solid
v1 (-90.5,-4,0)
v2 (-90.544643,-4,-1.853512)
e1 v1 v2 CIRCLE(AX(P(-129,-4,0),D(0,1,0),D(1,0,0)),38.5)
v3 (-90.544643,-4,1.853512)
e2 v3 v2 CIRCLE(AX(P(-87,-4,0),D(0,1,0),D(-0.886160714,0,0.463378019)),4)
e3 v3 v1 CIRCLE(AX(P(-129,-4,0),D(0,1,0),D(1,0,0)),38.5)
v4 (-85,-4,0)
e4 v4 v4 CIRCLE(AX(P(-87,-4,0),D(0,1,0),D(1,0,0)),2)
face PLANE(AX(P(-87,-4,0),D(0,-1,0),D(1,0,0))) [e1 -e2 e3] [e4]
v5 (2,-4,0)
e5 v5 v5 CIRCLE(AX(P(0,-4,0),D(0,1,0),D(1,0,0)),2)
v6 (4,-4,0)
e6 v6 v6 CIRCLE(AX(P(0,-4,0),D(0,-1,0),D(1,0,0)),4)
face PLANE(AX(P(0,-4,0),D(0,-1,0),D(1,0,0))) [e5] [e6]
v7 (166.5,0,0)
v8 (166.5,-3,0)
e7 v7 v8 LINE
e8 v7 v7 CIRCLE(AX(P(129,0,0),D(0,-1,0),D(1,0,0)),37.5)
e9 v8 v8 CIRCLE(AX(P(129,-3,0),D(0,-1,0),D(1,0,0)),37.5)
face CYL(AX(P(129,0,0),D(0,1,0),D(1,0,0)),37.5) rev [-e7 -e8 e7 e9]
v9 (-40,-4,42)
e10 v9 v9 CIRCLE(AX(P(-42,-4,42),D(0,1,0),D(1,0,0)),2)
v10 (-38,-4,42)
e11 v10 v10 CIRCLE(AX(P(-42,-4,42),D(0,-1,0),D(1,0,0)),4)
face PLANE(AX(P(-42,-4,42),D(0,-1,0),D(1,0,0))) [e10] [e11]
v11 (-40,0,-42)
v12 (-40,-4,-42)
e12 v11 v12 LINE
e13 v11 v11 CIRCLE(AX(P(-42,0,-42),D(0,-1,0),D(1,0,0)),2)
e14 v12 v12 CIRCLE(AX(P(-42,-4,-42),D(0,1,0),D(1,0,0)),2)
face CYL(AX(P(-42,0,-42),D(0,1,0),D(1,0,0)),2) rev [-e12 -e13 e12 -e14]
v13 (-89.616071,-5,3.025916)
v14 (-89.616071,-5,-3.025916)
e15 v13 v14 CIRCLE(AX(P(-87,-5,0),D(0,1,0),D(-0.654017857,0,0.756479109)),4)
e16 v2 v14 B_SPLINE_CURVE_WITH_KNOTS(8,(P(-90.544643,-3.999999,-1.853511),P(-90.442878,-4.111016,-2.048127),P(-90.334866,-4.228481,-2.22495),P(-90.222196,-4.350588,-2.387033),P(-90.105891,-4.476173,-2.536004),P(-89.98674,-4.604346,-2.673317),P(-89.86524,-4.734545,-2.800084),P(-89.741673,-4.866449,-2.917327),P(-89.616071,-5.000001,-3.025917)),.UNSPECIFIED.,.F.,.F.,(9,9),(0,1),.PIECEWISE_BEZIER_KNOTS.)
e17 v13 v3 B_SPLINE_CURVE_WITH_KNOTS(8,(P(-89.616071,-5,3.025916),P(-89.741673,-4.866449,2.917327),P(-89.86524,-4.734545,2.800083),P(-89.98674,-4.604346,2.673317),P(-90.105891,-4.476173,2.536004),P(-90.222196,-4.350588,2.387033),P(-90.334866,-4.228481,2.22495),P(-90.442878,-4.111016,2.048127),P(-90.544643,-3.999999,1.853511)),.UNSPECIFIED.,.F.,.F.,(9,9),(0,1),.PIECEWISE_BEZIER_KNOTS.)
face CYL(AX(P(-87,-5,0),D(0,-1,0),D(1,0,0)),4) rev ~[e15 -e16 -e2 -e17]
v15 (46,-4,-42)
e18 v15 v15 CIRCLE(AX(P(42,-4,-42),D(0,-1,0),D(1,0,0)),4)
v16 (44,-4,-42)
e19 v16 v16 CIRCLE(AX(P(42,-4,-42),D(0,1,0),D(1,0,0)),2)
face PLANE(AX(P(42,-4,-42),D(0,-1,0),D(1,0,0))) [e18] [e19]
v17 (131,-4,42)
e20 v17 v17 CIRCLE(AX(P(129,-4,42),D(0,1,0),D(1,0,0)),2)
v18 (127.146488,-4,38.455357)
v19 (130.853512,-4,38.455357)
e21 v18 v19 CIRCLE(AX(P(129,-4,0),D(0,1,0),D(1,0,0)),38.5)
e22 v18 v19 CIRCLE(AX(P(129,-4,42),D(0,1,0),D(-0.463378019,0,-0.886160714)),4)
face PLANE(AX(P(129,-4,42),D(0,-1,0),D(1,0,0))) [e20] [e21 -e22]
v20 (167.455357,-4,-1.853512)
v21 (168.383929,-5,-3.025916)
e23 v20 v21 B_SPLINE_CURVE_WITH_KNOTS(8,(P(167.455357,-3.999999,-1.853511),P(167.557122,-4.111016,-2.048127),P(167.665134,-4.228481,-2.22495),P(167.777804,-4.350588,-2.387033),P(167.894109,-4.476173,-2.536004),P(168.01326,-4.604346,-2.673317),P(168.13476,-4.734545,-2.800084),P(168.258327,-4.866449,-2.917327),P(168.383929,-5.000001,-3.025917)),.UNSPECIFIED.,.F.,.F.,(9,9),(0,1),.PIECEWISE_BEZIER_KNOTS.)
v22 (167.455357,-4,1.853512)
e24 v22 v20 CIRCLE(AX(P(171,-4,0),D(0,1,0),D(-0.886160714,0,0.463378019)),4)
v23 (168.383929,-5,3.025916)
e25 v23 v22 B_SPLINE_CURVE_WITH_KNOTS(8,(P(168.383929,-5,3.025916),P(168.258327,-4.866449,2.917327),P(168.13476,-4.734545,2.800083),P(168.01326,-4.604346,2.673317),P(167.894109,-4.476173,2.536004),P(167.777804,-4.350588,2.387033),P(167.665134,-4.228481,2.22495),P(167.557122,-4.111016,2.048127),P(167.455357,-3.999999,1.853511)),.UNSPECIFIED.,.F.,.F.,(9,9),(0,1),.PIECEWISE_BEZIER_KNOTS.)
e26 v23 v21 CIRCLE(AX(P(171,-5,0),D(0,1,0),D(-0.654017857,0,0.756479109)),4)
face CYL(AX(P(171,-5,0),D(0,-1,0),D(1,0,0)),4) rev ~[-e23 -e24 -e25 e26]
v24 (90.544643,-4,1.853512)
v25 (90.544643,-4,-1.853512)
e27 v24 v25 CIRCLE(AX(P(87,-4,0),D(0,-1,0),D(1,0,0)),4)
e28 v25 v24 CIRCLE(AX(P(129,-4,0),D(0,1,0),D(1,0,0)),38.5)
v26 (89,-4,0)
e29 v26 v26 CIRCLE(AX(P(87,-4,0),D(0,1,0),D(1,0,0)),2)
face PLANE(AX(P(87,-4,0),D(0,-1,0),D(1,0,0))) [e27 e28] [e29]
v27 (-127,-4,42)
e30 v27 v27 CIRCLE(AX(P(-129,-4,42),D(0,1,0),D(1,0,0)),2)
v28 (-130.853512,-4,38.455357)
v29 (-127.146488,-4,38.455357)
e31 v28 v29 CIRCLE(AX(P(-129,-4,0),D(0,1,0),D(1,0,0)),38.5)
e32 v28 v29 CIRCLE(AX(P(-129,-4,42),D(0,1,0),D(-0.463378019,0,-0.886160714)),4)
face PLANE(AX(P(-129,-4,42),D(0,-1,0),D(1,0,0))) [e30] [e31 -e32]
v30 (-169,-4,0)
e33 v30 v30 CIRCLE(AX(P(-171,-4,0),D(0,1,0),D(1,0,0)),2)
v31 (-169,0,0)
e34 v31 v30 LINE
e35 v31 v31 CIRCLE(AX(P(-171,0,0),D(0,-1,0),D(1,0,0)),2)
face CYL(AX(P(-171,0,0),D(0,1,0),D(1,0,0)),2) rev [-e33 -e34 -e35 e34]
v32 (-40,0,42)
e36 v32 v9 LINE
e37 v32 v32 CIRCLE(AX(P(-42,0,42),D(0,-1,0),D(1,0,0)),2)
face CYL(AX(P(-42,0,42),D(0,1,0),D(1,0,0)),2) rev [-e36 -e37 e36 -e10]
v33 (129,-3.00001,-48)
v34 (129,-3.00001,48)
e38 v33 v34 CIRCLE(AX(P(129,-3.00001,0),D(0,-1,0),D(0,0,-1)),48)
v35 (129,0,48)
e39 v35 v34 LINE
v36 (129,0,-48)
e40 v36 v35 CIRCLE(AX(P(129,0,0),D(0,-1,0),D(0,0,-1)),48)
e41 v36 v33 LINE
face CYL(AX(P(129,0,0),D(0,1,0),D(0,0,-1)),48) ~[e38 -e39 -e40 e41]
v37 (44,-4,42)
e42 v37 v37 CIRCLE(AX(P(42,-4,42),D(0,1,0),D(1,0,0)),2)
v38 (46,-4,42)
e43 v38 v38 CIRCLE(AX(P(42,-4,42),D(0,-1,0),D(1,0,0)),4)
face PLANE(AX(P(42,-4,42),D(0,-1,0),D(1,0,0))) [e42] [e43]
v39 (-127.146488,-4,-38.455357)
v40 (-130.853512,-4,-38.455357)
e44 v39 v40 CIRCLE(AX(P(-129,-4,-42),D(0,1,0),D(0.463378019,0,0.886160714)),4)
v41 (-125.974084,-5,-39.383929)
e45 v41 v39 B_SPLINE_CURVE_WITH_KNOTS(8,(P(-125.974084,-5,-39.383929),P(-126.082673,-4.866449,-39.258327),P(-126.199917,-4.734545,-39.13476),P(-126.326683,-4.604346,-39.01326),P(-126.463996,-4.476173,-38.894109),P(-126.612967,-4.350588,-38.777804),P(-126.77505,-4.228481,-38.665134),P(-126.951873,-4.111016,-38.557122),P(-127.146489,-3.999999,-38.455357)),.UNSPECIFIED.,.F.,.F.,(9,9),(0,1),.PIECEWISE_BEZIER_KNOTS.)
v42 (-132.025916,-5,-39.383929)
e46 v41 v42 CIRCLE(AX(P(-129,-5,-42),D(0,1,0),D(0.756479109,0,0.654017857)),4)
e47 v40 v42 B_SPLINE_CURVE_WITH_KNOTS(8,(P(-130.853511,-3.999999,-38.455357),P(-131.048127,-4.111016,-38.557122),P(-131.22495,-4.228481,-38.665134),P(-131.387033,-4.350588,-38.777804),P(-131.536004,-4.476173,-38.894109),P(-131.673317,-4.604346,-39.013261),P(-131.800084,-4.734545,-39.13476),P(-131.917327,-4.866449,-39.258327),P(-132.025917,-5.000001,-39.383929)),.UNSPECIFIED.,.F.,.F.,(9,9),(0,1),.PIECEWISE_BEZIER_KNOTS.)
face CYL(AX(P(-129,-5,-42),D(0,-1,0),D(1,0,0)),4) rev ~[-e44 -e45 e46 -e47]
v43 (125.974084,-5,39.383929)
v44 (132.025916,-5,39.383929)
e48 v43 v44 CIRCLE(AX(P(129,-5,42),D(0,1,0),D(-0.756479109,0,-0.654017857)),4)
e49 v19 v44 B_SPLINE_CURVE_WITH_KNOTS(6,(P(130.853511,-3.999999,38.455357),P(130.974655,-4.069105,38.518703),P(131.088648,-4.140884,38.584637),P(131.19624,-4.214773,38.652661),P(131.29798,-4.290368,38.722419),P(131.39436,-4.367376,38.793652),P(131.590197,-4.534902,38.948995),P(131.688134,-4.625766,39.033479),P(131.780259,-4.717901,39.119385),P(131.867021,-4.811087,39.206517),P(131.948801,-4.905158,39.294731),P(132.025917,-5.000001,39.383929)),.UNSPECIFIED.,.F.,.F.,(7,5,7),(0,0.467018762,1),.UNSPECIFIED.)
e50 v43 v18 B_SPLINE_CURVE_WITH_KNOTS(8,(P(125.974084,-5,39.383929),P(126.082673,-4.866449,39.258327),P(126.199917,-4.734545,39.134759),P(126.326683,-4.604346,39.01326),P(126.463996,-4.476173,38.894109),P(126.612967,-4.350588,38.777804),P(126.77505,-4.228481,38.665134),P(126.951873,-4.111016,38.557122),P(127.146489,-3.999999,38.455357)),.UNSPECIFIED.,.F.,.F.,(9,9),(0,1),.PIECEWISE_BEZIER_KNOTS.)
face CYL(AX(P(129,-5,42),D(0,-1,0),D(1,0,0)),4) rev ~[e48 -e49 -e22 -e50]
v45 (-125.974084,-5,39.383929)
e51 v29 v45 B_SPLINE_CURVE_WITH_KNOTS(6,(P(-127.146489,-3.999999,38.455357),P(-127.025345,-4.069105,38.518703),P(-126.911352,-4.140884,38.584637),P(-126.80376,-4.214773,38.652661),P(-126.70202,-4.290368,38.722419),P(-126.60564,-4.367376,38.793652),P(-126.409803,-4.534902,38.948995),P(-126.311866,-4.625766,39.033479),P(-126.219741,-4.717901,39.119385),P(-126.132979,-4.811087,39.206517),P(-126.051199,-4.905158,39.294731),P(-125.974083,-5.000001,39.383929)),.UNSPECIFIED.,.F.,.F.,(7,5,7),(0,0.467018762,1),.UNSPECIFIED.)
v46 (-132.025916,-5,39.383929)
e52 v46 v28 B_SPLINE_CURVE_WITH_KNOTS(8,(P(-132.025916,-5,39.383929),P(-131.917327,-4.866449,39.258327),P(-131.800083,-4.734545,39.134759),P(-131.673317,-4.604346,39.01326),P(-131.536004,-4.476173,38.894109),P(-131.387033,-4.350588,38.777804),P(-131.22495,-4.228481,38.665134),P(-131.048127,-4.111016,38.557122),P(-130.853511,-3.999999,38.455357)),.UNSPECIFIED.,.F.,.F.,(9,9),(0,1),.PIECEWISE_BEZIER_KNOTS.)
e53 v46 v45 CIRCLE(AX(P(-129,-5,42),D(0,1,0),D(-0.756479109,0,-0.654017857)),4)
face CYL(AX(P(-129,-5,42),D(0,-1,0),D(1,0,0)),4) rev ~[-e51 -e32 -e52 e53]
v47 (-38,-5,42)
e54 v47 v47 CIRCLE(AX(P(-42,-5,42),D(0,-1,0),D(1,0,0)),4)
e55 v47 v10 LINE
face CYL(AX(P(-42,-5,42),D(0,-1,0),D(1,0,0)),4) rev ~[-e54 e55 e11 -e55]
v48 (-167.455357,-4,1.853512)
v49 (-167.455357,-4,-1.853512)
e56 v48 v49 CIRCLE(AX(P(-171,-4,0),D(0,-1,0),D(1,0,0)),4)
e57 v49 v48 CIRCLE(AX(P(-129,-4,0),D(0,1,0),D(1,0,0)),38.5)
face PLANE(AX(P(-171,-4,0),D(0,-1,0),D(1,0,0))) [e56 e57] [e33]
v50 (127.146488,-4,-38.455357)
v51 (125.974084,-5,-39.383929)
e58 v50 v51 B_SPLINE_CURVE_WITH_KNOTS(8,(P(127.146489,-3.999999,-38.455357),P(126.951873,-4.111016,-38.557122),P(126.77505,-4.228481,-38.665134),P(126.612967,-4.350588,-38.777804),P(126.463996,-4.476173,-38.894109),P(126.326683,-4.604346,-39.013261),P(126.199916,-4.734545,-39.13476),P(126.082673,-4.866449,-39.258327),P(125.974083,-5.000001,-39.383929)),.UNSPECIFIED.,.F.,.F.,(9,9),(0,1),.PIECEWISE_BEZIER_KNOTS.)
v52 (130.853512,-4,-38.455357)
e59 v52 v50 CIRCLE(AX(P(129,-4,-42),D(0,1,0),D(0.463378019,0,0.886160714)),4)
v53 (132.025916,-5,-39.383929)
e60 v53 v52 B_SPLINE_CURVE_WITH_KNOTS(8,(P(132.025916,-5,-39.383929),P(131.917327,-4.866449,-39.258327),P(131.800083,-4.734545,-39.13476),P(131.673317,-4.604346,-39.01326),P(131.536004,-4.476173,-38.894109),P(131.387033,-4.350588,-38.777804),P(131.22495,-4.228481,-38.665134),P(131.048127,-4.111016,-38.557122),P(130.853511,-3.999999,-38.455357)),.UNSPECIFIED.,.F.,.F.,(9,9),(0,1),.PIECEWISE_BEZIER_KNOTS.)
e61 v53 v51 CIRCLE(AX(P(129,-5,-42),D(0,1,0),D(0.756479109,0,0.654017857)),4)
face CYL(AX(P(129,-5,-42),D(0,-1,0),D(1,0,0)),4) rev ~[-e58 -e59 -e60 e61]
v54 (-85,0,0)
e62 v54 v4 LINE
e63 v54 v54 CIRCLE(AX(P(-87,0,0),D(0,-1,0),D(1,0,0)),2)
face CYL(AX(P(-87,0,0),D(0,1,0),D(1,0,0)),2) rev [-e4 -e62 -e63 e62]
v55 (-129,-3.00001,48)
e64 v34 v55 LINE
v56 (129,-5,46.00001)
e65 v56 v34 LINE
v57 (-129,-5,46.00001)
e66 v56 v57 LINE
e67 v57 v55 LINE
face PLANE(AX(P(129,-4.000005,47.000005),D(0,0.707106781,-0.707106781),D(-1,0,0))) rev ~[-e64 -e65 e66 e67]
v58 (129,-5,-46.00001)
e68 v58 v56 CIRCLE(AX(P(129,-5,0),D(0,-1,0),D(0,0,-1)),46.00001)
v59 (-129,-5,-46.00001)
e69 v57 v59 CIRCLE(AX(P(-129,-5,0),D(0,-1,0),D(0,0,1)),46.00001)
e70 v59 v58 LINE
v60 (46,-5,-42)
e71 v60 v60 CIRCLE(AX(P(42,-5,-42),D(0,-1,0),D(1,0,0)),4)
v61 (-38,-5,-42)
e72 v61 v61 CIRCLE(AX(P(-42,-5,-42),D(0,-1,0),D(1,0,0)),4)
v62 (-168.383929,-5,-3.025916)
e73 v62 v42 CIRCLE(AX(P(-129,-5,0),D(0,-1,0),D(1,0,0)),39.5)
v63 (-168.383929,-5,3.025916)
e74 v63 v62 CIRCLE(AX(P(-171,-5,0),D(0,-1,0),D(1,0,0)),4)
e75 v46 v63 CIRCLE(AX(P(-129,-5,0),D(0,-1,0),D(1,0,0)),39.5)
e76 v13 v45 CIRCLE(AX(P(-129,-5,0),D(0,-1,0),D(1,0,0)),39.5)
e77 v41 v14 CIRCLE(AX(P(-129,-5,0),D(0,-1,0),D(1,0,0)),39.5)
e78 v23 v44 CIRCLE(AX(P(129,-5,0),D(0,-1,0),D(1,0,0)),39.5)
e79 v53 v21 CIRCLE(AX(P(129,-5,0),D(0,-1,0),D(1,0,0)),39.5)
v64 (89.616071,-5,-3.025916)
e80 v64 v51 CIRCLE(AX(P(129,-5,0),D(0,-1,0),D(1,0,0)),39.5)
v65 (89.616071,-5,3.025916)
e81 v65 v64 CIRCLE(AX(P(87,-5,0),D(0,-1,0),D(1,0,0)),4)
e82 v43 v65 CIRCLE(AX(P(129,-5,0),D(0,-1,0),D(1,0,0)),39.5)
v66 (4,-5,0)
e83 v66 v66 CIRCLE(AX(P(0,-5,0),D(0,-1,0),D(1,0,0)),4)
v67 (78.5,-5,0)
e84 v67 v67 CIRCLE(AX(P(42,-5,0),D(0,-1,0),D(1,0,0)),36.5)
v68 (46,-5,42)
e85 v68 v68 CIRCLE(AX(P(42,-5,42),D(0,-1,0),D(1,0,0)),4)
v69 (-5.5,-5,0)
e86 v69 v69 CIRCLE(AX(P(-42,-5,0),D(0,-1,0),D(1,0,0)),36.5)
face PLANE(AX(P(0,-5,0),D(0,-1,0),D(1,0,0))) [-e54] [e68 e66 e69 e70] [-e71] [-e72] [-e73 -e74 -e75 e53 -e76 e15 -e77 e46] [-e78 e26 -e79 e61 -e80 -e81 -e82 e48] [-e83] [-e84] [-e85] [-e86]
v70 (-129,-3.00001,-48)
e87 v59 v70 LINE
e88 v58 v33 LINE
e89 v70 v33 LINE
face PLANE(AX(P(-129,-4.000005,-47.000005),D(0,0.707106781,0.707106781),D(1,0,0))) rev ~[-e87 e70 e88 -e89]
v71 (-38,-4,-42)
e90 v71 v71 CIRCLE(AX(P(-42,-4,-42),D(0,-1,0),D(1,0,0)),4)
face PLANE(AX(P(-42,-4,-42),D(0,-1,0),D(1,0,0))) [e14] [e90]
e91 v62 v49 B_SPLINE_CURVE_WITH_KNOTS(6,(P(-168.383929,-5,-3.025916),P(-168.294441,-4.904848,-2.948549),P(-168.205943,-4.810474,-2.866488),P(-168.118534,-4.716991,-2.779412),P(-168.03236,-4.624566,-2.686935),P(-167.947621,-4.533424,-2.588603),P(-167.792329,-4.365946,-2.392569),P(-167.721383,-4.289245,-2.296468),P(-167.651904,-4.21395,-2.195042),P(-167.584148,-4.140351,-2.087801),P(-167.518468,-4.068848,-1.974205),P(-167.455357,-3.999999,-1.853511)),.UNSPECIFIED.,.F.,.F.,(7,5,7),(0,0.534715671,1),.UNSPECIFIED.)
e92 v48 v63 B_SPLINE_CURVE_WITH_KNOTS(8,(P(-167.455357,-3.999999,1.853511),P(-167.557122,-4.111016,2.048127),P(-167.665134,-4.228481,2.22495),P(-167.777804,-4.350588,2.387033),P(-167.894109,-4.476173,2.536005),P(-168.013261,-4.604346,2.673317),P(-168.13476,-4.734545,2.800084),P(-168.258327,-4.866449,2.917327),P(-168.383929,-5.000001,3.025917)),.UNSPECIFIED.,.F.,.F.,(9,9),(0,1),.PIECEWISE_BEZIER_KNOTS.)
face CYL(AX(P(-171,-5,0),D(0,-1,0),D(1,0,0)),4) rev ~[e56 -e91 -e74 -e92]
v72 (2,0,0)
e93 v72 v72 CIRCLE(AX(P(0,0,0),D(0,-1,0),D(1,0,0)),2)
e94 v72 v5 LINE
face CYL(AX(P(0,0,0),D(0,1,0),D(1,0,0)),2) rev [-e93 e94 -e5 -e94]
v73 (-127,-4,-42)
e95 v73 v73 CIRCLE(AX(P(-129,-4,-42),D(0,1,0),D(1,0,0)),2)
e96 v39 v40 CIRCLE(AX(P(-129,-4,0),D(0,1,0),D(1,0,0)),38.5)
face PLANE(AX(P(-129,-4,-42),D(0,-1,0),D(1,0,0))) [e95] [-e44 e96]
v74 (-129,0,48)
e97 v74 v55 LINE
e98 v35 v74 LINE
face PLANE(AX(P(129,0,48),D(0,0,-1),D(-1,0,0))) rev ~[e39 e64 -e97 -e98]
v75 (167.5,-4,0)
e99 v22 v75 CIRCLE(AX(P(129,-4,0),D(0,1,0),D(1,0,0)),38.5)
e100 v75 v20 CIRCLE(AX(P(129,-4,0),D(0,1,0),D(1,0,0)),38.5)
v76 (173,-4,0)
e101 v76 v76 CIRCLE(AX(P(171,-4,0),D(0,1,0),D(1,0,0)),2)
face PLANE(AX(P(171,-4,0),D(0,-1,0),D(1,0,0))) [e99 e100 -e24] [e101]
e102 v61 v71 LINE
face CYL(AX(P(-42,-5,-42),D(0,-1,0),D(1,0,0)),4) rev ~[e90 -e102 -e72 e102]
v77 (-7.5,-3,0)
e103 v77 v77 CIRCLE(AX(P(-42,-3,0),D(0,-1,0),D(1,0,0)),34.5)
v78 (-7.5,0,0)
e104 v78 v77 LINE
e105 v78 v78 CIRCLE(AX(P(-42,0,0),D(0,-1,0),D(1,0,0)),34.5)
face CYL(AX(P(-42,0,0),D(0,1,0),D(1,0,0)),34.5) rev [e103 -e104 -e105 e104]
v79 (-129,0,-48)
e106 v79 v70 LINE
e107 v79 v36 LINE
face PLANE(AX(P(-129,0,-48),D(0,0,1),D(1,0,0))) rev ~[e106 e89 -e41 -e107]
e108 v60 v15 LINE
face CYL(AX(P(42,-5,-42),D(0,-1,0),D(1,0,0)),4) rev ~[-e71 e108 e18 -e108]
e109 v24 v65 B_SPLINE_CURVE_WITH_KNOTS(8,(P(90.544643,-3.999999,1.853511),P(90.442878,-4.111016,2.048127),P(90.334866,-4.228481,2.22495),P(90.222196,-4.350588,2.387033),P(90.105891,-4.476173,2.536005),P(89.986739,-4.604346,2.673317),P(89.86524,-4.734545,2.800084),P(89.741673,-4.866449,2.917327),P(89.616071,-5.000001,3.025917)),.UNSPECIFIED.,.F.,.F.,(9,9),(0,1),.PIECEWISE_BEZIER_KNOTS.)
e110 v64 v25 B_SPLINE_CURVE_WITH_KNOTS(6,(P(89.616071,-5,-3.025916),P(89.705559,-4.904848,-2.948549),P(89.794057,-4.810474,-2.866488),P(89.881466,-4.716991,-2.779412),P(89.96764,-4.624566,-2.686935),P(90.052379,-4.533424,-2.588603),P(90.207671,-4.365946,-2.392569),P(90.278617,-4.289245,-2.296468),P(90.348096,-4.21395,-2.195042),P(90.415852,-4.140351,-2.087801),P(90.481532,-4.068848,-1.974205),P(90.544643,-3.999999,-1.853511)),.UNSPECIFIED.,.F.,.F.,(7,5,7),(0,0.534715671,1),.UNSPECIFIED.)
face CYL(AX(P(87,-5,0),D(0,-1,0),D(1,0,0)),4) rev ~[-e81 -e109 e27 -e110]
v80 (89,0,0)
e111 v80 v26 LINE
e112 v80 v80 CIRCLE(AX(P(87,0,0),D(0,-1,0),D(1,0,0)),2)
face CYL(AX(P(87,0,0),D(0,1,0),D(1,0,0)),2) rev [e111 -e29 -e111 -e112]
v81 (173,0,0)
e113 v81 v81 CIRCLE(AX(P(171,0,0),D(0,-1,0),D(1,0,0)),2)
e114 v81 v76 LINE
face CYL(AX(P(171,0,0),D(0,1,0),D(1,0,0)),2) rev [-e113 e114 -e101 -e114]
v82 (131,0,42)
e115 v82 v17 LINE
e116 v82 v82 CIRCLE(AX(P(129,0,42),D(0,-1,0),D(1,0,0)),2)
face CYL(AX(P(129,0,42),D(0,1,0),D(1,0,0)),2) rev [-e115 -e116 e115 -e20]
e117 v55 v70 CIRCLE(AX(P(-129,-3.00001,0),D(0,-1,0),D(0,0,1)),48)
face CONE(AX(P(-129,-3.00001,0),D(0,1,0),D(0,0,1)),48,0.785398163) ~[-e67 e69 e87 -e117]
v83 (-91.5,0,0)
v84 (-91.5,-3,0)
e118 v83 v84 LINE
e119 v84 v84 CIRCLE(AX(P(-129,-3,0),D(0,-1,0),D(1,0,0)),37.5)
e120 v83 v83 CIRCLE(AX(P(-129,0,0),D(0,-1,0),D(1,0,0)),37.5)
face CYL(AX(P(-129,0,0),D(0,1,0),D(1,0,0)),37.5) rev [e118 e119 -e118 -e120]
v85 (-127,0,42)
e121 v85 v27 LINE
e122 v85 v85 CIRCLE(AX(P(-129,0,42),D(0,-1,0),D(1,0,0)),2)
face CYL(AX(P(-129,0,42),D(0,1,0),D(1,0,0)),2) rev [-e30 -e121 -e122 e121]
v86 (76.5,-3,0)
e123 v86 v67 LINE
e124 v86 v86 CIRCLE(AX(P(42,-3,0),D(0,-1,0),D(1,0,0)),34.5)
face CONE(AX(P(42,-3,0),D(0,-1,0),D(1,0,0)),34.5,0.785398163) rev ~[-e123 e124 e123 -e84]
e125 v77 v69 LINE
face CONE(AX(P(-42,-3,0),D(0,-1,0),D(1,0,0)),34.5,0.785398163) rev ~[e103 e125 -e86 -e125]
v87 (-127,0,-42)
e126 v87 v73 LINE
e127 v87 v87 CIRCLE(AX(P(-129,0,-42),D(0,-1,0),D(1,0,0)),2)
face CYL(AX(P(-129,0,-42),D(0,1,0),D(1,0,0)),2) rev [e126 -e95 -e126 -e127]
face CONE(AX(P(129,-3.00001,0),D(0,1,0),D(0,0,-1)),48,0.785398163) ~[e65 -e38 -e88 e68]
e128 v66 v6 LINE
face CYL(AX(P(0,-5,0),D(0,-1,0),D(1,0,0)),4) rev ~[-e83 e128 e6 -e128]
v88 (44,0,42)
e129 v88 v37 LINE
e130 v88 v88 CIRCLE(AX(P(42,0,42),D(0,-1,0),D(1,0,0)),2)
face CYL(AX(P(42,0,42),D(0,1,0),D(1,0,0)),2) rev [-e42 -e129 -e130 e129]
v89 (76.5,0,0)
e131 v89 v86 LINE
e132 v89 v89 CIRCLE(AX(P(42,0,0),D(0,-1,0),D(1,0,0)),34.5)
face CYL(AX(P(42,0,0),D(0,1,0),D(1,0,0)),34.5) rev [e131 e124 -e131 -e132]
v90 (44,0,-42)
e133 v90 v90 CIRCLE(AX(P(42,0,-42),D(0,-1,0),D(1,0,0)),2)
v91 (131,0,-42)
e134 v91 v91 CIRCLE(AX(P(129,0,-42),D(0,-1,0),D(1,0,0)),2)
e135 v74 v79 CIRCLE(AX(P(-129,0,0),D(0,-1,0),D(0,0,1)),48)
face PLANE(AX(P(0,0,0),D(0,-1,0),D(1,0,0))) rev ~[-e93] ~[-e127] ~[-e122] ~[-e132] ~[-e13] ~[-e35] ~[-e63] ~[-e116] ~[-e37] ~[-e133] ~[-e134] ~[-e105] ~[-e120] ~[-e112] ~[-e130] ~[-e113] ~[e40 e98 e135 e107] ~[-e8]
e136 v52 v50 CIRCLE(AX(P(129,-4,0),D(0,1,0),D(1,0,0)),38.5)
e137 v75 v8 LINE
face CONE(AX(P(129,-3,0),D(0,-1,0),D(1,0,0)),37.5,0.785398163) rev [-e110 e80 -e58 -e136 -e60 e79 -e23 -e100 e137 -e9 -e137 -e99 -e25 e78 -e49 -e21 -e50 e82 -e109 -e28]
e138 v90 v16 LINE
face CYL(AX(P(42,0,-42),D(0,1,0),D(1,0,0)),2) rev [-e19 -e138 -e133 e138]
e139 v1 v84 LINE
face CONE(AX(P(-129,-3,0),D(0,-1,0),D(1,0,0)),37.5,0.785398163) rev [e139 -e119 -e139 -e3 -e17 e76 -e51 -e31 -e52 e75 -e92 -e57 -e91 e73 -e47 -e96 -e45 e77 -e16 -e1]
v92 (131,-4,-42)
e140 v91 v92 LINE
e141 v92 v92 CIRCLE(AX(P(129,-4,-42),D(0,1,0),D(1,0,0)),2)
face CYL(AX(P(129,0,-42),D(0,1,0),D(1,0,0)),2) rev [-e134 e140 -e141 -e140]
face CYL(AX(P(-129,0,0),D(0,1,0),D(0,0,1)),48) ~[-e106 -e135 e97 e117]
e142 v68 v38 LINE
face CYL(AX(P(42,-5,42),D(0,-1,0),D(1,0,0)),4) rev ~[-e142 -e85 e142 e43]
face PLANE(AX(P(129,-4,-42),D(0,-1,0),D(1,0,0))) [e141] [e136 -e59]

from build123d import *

# Parameters (mm, degrees)
F0_R     = 2
F0_R_2   = 37.5
F0_R_3   = 34.5
F1_DEPTH = 5
F2_SIZE  = 2
F3_SIZE  = 2
F4_R     = 4
F5_DEPTH = 1
F6_SIZE  = 1.99999


# Not quite as in the source:
# - a fillet or chamfer is up to 0.001 mm smaller than in the source, because OpenCascade refuses the exact size


with BuildPart() as f1:
    # F0 (on Front) → F1 (new body)
    with BuildSketch(Plane.XZ):
        with BuildLine():
            ThreePointArc((129, -48), (177, 0), (129, 48))
            Line((129, 48), (0, 48))
            Line((0, 48), (-129, 48))
            ThreePointArc((-129, 48), (-177, 0), (-129, -48))
            Line((-129, -48), (0, -48))
            Line((0, -48), (129, -48))
        make_face()
        with Locations((-129, -42)):
            Circle(F0_R, mode=Mode.SUBTRACT)
        with Locations((-42, -42)):
            Circle(F0_R, mode=Mode.SUBTRACT)
        with Locations((42, -42)):
            Circle(F0_R, mode=Mode.SUBTRACT)
        with Locations((129, -42)):
            Circle(F0_R, mode=Mode.SUBTRACT)
        with Locations((-171, 0)):
            Circle(F0_R, mode=Mode.SUBTRACT)
        with Locations((-129, 0)):
            Circle(F0_R_2, mode=Mode.SUBTRACT)
        with Locations((-87, 0)):
            Circle(F0_R, mode=Mode.SUBTRACT)
        with Locations((-42, 0)):
            Circle(F0_R_3, mode=Mode.SUBTRACT)
        with Locations((-129, 42)):
            Circle(F0_R, mode=Mode.SUBTRACT)
        with Locations((-42, 42)):
            Circle(F0_R, mode=Mode.SUBTRACT)
        Circle(F0_R, mode=Mode.SUBTRACT)
        with Locations((42, 0)):
            Circle(F0_R_3, mode=Mode.SUBTRACT)
        with Locations((87, 0)):
            Circle(F0_R, mode=Mode.SUBTRACT)
        with Locations((129, 0)):
            Circle(F0_R_2, mode=Mode.SUBTRACT)
        with Locations((171, 0)):
            Circle(F0_R, mode=Mode.SUBTRACT)
        with Locations((42, 42)):
            Circle(F0_R, mode=Mode.SUBTRACT)
        with Locations((129, 42)):
            Circle(F0_R, mode=Mode.SUBTRACT)
    extrude(amount=F1_DEPTH)

    # F2
    f2_edges = [f1.edges().sort_by_distance(p)[0] for p in [
        (7.5, -5, 0),
        (-76.5, -5, 0),
    ]]
    chamfer(f2_edges, length=F2_SIZE)

    # F3
    f3_edges = [f1.edges().sort_by_distance(p)[0] for p in [
        (91.5, -5, 0),
        (-166.5, -5, 0),
    ]]
    chamfer(f3_edges, length=F3_SIZE)

    # F4 (on face) → F5 (cut)
    with BuildSketch(Plane.XZ.offset(5)):
        Circle(F4_R)
        with Locations((42, 42)):
            Circle(F4_R)
        with Locations((42, -42)):
            Circle(F4_R)
        with Locations((129, 42)):
            Circle(F4_R)
        with Locations((87, 0)):
            Circle(F4_R)
        with Locations((129, -42)):
            Circle(F4_R)
        with Locations((171, 0)):
            Circle(F4_R)
        with Locations((-42, 42)):
            Circle(F4_R)
        with Locations((-42, -42)):
            Circle(F4_R)
        with Locations((-87, 0)):
            Circle(F4_R)
        with Locations((-129, -42)):
            Circle(F4_R)
        with Locations((-129, 42)):
            Circle(F4_R)
        with Locations((-171, 0)):
            Circle(F4_R)
    extrude(amount=-F5_DEPTH, mode=Mode.SUBTRACT)

    # F6 (size 2 in the source; OpenCascade refuses exactly that, so slightly less here)
    f6_edges = [f1.edges().sort_by_distance(p)[0] for p in [
        (-177, -5, 0),
        (0, -5, 48),
        (0, -5, -48),
        (177, -5, 0),
    ]]
    chamfer(f6_edges, length=F6_SIZE)


solid = f1.part
